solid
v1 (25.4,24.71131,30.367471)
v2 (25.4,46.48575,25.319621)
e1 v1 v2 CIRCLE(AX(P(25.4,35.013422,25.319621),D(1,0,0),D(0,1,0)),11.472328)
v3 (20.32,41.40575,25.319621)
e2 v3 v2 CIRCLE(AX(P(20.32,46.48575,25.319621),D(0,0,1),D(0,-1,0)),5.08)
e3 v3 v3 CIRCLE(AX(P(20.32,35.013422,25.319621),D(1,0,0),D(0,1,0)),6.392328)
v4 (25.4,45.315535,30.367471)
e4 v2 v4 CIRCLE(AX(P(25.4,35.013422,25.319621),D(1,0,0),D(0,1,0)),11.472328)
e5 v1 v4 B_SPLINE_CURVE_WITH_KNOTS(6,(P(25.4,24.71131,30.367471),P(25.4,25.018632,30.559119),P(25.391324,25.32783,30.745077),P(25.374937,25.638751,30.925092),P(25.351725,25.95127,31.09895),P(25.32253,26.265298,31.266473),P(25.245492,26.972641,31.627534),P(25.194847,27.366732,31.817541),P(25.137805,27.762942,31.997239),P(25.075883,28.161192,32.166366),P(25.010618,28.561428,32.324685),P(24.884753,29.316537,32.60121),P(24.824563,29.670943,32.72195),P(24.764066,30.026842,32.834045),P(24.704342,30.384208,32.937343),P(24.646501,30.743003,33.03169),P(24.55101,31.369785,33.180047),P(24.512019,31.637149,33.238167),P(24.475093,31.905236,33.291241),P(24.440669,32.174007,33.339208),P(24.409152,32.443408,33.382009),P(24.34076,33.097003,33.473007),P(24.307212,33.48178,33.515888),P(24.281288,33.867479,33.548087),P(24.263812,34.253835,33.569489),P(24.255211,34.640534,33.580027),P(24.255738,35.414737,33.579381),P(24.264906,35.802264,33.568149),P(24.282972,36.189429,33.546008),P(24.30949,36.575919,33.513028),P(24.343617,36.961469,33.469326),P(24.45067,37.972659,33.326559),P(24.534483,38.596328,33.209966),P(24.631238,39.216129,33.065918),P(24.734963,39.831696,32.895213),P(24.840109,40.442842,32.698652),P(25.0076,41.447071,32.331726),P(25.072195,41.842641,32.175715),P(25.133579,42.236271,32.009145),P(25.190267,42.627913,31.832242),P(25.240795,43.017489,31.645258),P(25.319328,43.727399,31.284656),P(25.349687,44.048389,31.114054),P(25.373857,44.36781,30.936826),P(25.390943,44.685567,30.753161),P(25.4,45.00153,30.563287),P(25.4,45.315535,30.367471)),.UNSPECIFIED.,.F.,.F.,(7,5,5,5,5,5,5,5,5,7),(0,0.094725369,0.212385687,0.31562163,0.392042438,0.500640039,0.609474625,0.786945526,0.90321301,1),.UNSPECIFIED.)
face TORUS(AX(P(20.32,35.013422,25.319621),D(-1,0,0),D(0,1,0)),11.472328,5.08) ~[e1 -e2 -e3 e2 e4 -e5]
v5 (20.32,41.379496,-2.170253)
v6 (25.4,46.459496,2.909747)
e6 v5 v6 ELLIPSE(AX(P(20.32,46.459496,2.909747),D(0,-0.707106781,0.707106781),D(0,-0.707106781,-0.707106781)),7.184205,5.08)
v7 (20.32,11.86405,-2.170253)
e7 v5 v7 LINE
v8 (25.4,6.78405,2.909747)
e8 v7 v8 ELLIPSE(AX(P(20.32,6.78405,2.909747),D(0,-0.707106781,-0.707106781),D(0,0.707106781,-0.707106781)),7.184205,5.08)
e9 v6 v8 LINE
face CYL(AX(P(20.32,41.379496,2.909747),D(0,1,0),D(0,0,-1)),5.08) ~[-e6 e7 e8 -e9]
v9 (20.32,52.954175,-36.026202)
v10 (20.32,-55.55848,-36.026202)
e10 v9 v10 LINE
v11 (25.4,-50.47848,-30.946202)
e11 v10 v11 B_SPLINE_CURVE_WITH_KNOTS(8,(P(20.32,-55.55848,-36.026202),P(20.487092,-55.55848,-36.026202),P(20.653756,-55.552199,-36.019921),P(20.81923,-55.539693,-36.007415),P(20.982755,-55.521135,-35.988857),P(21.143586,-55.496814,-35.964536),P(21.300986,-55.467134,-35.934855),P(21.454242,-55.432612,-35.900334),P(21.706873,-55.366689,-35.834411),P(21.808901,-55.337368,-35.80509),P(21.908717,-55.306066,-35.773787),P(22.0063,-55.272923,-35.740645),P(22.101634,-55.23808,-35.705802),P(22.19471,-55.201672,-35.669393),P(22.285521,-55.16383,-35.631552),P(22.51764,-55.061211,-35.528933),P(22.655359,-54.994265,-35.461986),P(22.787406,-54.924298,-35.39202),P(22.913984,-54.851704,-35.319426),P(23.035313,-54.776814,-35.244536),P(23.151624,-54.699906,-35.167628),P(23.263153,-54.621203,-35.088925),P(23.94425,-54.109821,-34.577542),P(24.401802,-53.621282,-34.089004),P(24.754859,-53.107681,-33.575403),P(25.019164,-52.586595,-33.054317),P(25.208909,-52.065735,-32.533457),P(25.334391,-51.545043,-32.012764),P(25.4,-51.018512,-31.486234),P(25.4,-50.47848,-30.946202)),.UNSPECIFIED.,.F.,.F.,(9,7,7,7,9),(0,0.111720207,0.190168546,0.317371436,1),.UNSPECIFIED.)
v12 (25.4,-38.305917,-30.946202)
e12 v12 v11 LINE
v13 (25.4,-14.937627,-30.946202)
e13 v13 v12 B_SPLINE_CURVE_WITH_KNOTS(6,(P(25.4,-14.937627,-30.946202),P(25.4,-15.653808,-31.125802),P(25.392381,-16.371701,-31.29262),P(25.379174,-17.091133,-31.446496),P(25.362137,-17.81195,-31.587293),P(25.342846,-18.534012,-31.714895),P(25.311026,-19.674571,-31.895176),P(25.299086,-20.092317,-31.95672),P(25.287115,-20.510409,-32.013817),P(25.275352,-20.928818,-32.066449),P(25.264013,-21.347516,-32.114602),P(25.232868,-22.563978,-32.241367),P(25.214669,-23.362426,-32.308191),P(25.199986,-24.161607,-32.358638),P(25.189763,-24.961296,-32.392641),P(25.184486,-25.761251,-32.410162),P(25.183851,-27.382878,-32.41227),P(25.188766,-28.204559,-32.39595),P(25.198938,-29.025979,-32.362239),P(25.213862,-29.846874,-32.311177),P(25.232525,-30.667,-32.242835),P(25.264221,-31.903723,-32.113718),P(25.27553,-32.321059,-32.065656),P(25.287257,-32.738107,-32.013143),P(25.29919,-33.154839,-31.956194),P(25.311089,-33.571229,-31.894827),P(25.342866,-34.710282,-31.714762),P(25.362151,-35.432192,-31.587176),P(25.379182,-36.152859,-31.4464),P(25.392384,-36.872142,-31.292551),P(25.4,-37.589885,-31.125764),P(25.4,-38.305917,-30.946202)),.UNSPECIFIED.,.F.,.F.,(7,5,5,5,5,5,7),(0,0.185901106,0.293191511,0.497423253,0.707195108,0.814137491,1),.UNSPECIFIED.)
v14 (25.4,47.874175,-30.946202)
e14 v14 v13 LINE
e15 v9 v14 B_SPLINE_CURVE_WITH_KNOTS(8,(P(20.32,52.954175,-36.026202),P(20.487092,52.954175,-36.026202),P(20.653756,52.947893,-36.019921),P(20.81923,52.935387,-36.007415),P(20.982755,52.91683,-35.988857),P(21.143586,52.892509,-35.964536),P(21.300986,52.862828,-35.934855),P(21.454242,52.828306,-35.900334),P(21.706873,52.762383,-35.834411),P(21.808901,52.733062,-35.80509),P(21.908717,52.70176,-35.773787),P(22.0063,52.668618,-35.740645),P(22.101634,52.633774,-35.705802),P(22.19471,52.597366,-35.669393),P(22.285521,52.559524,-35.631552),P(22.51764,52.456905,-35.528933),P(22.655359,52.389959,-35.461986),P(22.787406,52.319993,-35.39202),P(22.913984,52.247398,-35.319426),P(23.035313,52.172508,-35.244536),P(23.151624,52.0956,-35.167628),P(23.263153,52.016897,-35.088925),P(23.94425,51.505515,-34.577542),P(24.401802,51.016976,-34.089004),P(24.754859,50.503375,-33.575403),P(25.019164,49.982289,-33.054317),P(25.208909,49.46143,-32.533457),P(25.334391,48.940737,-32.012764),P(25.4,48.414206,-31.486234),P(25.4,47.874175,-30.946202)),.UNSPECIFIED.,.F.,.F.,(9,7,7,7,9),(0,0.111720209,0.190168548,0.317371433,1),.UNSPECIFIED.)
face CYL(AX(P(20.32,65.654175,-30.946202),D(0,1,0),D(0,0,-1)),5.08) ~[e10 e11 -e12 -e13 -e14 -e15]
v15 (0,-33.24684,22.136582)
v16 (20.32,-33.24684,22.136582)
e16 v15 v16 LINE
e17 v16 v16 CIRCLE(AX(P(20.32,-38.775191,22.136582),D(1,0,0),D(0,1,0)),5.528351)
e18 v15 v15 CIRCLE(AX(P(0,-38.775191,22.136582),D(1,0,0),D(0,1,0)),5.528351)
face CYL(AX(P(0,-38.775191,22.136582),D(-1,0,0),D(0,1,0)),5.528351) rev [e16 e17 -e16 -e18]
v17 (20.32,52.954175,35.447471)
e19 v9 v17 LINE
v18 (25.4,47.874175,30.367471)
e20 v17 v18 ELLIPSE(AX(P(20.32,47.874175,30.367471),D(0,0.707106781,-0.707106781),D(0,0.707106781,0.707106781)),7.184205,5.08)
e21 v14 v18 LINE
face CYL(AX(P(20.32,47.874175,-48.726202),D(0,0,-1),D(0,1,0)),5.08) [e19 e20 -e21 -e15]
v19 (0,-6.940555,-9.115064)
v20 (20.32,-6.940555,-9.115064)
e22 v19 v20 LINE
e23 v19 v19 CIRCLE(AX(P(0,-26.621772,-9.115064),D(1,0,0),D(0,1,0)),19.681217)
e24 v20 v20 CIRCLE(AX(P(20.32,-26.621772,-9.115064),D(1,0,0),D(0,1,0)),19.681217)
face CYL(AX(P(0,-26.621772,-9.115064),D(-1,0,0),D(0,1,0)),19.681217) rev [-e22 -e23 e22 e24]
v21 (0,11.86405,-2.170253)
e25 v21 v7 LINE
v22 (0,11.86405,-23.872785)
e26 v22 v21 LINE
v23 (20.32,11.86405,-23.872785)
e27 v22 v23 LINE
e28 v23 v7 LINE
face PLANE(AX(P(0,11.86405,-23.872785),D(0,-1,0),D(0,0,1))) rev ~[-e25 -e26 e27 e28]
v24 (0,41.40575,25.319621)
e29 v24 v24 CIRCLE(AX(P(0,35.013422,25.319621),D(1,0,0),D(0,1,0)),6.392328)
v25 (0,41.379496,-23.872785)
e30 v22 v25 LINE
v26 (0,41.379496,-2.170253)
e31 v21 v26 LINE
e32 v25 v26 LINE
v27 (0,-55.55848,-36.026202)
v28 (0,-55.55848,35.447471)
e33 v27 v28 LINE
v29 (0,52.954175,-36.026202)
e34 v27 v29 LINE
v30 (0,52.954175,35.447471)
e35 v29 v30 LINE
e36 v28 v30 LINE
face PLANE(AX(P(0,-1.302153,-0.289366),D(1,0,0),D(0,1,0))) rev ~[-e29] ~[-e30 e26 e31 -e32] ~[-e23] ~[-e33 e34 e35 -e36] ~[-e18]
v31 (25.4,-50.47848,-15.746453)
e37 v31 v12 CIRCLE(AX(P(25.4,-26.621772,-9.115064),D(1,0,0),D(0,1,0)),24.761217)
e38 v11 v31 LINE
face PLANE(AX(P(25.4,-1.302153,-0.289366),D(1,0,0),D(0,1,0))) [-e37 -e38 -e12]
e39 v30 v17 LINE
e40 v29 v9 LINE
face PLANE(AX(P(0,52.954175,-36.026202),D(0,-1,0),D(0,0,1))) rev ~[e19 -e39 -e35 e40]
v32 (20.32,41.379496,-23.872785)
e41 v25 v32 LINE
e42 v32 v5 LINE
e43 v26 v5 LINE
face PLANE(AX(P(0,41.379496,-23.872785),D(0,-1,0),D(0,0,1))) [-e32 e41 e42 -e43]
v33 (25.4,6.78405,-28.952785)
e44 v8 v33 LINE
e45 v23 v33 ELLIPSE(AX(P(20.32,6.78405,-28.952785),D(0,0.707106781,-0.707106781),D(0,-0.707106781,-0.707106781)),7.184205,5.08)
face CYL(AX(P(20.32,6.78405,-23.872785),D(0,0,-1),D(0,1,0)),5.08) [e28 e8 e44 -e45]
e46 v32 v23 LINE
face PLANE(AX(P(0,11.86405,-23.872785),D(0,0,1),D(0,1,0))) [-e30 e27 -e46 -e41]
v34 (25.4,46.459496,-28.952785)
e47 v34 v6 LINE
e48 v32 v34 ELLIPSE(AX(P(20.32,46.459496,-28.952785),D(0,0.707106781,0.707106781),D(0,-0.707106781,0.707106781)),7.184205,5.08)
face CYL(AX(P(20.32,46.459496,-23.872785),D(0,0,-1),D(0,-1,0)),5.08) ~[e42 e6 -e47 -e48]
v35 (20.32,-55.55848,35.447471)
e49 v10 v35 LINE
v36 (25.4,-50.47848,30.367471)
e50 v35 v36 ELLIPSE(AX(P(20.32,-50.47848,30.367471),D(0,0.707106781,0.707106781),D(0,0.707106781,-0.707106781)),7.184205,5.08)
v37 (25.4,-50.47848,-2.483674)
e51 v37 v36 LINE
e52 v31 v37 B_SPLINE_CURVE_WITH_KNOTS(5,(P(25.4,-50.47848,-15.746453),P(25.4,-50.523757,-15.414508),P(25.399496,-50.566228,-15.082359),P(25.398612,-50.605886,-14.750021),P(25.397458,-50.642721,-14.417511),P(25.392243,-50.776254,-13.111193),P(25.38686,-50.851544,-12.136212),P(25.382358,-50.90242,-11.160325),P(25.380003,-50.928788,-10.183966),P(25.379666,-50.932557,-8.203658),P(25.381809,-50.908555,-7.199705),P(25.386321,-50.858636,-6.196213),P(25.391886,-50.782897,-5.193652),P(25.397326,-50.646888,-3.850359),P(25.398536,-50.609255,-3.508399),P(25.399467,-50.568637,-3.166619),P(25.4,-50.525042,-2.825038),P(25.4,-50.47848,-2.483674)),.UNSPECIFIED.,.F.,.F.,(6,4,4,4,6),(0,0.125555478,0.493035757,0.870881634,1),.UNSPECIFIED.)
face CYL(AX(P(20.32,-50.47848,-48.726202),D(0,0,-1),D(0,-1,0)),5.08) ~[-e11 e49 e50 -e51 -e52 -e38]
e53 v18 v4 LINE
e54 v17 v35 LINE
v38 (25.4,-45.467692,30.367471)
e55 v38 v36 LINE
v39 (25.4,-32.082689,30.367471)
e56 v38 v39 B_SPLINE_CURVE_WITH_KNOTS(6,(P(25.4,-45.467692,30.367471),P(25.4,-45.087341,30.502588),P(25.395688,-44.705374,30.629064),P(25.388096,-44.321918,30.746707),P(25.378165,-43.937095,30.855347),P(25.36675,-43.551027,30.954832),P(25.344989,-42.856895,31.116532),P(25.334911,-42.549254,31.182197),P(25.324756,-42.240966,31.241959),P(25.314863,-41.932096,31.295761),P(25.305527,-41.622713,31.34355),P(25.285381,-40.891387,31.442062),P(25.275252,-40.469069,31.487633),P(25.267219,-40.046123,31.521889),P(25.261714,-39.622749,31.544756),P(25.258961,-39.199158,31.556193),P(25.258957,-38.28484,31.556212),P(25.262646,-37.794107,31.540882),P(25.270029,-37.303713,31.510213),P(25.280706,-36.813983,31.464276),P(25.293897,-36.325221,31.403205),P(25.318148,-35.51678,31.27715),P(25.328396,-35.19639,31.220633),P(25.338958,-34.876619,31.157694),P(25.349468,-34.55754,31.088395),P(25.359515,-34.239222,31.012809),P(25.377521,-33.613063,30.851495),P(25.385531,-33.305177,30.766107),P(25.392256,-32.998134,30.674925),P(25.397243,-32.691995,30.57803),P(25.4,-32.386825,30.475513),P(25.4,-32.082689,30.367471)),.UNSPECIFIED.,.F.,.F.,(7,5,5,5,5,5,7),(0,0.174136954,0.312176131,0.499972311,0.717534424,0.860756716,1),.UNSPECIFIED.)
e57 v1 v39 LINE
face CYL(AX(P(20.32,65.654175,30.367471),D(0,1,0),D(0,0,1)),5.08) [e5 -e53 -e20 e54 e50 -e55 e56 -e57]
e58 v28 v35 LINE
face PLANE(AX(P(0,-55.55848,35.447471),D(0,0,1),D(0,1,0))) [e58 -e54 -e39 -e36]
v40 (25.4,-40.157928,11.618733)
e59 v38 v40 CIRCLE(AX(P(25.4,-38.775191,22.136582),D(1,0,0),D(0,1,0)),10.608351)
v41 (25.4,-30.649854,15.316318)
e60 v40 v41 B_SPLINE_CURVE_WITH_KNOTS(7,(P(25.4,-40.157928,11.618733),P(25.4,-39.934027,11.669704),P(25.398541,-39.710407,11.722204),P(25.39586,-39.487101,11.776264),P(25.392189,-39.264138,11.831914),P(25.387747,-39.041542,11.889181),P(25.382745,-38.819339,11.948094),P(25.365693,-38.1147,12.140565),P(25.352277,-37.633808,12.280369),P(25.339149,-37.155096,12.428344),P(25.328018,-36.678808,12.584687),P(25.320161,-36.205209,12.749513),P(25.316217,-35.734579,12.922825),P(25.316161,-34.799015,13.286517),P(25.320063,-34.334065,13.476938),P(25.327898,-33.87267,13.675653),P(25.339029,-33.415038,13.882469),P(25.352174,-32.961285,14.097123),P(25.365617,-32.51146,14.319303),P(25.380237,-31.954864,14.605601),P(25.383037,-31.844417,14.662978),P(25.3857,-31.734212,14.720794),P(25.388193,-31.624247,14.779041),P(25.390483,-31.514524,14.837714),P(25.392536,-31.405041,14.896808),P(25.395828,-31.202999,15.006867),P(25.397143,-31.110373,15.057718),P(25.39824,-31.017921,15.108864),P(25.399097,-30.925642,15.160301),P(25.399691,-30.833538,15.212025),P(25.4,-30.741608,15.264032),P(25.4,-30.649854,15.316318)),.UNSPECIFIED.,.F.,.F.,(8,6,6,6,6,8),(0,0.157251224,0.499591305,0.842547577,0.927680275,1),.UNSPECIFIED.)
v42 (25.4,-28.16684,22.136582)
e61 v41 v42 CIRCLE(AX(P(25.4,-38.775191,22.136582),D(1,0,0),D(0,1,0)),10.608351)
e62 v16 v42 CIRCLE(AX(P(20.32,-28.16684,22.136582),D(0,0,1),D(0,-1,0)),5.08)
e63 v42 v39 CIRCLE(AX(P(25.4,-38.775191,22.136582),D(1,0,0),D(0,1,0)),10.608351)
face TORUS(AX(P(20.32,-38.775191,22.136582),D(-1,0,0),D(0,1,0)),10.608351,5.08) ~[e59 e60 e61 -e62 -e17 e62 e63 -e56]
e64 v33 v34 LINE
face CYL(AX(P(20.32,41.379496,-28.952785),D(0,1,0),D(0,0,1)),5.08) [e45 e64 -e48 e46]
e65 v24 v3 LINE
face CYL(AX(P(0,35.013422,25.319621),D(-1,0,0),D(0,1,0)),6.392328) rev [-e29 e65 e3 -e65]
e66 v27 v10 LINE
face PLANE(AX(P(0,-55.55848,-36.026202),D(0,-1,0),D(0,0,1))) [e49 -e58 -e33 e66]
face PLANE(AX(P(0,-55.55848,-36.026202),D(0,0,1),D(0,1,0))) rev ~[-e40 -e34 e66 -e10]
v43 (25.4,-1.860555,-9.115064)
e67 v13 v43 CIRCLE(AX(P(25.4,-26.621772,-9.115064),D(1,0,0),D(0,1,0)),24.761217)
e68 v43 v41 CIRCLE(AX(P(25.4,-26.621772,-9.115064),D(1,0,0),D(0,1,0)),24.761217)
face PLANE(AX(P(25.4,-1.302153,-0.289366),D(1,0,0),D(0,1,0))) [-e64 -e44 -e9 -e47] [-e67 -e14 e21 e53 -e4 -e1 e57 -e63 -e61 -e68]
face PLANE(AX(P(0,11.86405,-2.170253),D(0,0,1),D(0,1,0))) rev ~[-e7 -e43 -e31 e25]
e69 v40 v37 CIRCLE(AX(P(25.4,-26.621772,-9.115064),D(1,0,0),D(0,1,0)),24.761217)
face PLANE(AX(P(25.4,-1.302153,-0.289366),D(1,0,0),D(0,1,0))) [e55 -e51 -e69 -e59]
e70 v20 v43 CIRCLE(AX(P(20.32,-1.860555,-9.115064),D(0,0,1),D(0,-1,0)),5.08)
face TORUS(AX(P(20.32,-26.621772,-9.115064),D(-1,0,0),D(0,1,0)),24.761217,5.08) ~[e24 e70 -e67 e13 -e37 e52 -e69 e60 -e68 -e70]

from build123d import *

# Parameters (mm, degrees)
F0_W         = 108.5126549006
F0_H         = 71.473672986
F0_R         = 19.6812167499
F0_W_2       = 29.5154461637
F0_H_2       = 21.7025321908
F0_R_2       = 5.5283506547
F0_R_3       = 6.3923279955
F1_DEPTH     = 25.4
F2_T1_DEPTH  = 29.5154461637
F2_T3_DEPTH  = 133.9126549006
F2_T5_DEPTH  = 96.873672986
F2_T7_DEPTH  = 21.7025321908
F2_T19_DEPTH = 34.4025321908
F2_T23_DEPTH = 42.2154461637
F2_T30_DEPTH = 42.2154461637
F2_T34_DEPTH = 34.4025321908
F2_T41_DEPTH = 34.4025321908
F2_T45_DEPTH = 42.2154461637
F2_T52_DEPTH = 34.4025321908
F2_T56_DEPTH = 42.2154461637


# Not quite as in the source:
# - a fillet or chamfer that OpenCascade refuses, or shapes differently, is made with other operations: its cross-section is extruded or revolved along the edge and cut away or added


with BuildPart() as f1:
    # F0 (on Right) → F1 (new body)
    with BuildSketch(Plane.YZ):
        with Locations((-1.3021528721, -0.2893656492)):
            Rectangle(F0_W, F0_H)
        with Locations((-26.6217719764, -9.1150635853)):
            Circle(F0_R, mode=Mode.SUBTRACT)
        with Locations((26.6217733733, -13.0215191748)):
            Rectangle(F0_W_2, F0_H_2, mode=Mode.SUBTRACT)
        with Locations((-38.775190711, 22.1365820616)):
            Circle(F0_R_2, mode=Mode.SUBTRACT)
        with Locations((35.01342237, 25.3196209669)):
            Circle(F0_R_3, mode=Mode.SUBTRACT)
    extrude(amount=F1_DEPTH)

    # F2: fillet of radius 5.08 on 11 edges, made by hand

    # F2_s2 → F2_t1 (cut)
    with BuildSketch(Plane.XZ.offset(-41.3794964552)):
        with BuildLine():
            ThreePointArc((20.32, -2.1702530794), (23.9121024484, -0.6823555278), (25.4, 2.9097469206))
            Line((25.4, 2.9097469206), (25.4, -2.1702530794))
            Line((25.4, -2.1702530794), (20.32, -2.1702530794))
        make_face()
        with BuildLine():
            ThreePointArc((20.32, -23.8727852702), (23.9121024484, -25.3606828218), (25.4, -28.9527852702))
            Line((25.4, -28.9527852702), (25.4, -23.8727852702))
            Line((25.4, -23.8727852702), (20.32, -23.8727852702))
        make_face()
    extrude(amount=F2_T1_DEPTH, mode=Mode.SUBTRACT)

    # F2_s4 → F2_t3 (cut)
    with BuildSketch(Plane.XZ.offset(-65.6541745782)):
        with BuildLine():
            ThreePointArc((20.32, 35.4474708438), (23.9121024484, 33.9595732922), (25.4, 30.3674708438))
            Line((25.4, 30.3674708438), (25.4, 35.4474708438))
            Line((25.4, 35.4474708438), (20.32, 35.4474708438))
        make_face()
        with BuildLine():
            ThreePointArc((20.32, -36.0262021422), (23.9121024484, -34.5383045907), (25.4, -30.9462021422))
            Line((25.4, -30.9462021422), (25.4, -36.0262021422))
            Line((25.4, -36.0262021422), (20.32, -36.0262021422))
        make_face()
    extrude(amount=F2_T3_DEPTH, mode=Mode.SUBTRACT)

    # F2_s6 → F2_t5 (cut)
    with BuildSketch(Plane.XY.offset(-48.7262021422)):
        with BuildLine():
            ThreePointArc((20.32, -55.5584803224), (23.9121024484, -54.0705827708), (25.4, -50.4784803224))
            Line((25.4, -50.4784803224), (25.4, -55.5584803224))
            Line((25.4, -55.5584803224), (20.32, -55.5584803224))
        make_face()
        with BuildLine():
            ThreePointArc((20.32, 52.9541745782), (23.9121024484, 51.4662770266), (25.4, 47.8741745782))
            Line((25.4, 47.8741745782), (25.4, 52.9541745782))
            Line((25.4, 52.9541745782), (20.32, 52.9541745782))
        make_face()
    extrude(amount=F2_T5_DEPTH, mode=Mode.SUBTRACT)

    # F2_s8 → F2_t7 (cut)
    with BuildSketch(Plane.XY.offset(-23.8727852702)):
        with BuildLine():
            ThreePointArc((20.32, 11.8640502915), (23.9121024484, 10.3761527399), (25.4, 6.7840502915))
            Line((25.4, 6.7840502915), (25.4, 11.8640502915))
            Line((25.4, 11.8640502915), (20.32, 11.8640502915))
        make_face()
        with BuildLine():
            ThreePointArc((20.32, 41.3794964552), (23.9121024484, 42.8673940068), (25.4, 46.4594964552))
            Line((25.4, 46.4594964552), (25.4, 41.3794964552))
            Line((25.4, 41.3794964552), (20.32, 41.3794964552))
        make_face()
    extrude(amount=F2_T7_DEPTH, mode=Mode.SUBTRACT)

    # F2_s9 → F2_t10 (revolve, cut)
    with BuildSketch(Plane.XY.offset(-9.1150635853)):
        with BuildLine():
            ThreePointArc((20.32, -6.9405552264), (23.9121024484, -5.4526576749), (25.4, -1.8605552264))
            Line((25.4, -1.8605552264), (25.4, -6.9405552264))
            Line((25.4, -6.9405552264), (20.32, -6.9405552264))
        make_face()
    revolve(axis=Axis((25.4, -26.6217719764, -9.1150635853), (1, 0, 0)), mode=Mode.SUBTRACT)

    # F2_s11 → F2_t12 (revolve, cut)
    with BuildSketch(Plane.XY.offset(22.1365820616)):
        with BuildLine():
            ThreePointArc((20.32, -33.2468400563), (23.9121024484, -31.7589425047), (25.4, -28.1668400563))
            Line((25.4, -28.1668400563), (25.4, -33.2468400563))
            Line((25.4, -33.2468400563), (20.32, -33.2468400563))
        make_face()
    revolve(axis=Axis((25.4, -38.775190711, 22.1365820616), (1, 0, 0)), mode=Mode.SUBTRACT)

    # F2_s13 → F2_t14 (revolve, cut)
    with BuildSketch(Plane.XY.offset(25.3196209669)):
        with BuildLine():
            ThreePointArc((20.32, 41.4057503654), (23.9121024484, 42.893647917), (25.4, 46.4857503654))
            Line((25.4, 46.4857503654), (25.4, 41.4057503654))
            Line((25.4, 41.4057503654), (20.32, 41.4057503654))
        make_face()
    revolve(axis=Axis((25.4, 35.01342237, 25.3196209669), (1, 0, 0)), mode=Mode.SUBTRACT)


with BuildPart() as f2_tool17:
    # F2_s18 → F2_t19 (new body)
    with BuildSketch(Plane.XY.offset(-23.8727852702)):
        with BuildLine():
            ThreePointArc((20.32, 11.8640502915), (23.9121024484, 10.3761527399), (25.4, 6.7840502915))
            Line((25.4, 6.7840502915), (25.4, 11.8640502915))
            Line((25.4, 11.8640502915), (20.32, 11.8640502915))
        make_face()
    extrude(amount=F2_T19_DEPTH)

    split(bisect_by=Plane.XY.offset(-2.1702530794), keep=Keep.TOP)


with BuildPart() as f2_tool21:
    # F2_s22 → F2_t23 (new body)
    with BuildSketch(Plane.XZ.offset(0.8359497085)):
        with BuildLine():
            ThreePointArc((20.32, -2.1702530794), (23.9121024484, -0.6823555278), (25.4, 2.9097469206))
            Line((25.4, 2.9097469206), (25.4, -2.1702530794))
            Line((25.4, -2.1702530794), (20.32, -2.1702530794))
        make_face()
    extrude(amount=-F2_T23_DEPTH)

    split(bisect_by=Plane.XZ.offset(-11.8640502915), keep=Keep.TOP)


with BuildPart() as f2_tool17_1:
    add(f2_tool17.part)

    # F2_t25: intersect F2_tool21
    add(f2_tool21.part, mode=Mode.INTERSECT)


with BuildPart() as f1_1:
    add(f1.part)

    # F2_t15: cut F2_tool17
    add(f2_tool17_1.part, mode=Mode.SUBTRACT)


with BuildPart() as f2_tool28:
    # F2_s29 → F2_t30 (new body)
    with BuildSketch(Plane.XZ.offset(-11.8640502915)):
        with BuildLine():
            ThreePointArc((20.32, -2.1702530794), (23.9121024484, -0.6823555278), (25.4, 2.9097469206))
            Line((25.4, 2.9097469206), (25.4, -2.1702530794))
            Line((25.4, -2.1702530794), (20.32, -2.1702530794))
        make_face()
    extrude(amount=-F2_T30_DEPTH)

    split(bisect_by=Plane.XZ.offset(-41.3794964552), keep=Keep.BOTTOM)


with BuildPart() as f2_tool32:
    # F2_s33 → F2_t34 (new body)
    with BuildSketch(Plane.XY.offset(10.5297469206)):
        with BuildLine():
            ThreePointArc((20.32, 41.3794964552), (23.9121024484, 42.8673940068), (25.4, 46.4594964552))
            Line((25.4, 46.4594964552), (25.4, 41.3794964552))
            Line((25.4, 41.3794964552), (20.32, 41.3794964552))
        make_face()
    extrude(amount=-F2_T34_DEPTH)

    split(bisect_by=Plane.XY.offset(-2.1702530794), keep=Keep.TOP)


with BuildPart() as f2_tool28_1:
    add(f2_tool28.part)

    # F2_t36: intersect F2_tool32
    add(f2_tool32.part, mode=Mode.INTERSECT)


with BuildPart() as f1_2:
    add(f1_1.part)

    # F2_t26: cut F2_tool28
    add(f2_tool28_1.part, mode=Mode.SUBTRACT)


with BuildPart() as f2_tool39:
    # F2_s40 → F2_t41 (new body)
    with BuildSketch(Plane.XY.offset(-36.5727852702)):
        with BuildLine():
            ThreePointArc((20.32, 11.8640502915), (23.9121024484, 10.3761527399), (25.4, 6.7840502915))
            Line((25.4, 6.7840502915), (25.4, 11.8640502915))
            Line((25.4, 11.8640502915), (20.32, 11.8640502915))
        make_face()
    extrude(amount=F2_T41_DEPTH)

    split(bisect_by=Plane.XY.offset(-23.8727852702), keep=Keep.BOTTOM)


with BuildPart() as f2_tool43:
    # F2_s44 → F2_t45 (new body)
    with BuildSketch(Plane.XZ.offset(-41.3794964552)):
        with BuildLine():
            ThreePointArc((20.32, -23.8727852702), (23.9121024484, -25.3606828218), (25.4, -28.9527852702))
            Line((25.4, -28.9527852702), (25.4, -23.8727852702))
            Line((25.4, -23.8727852702), (20.32, -23.8727852702))
        make_face()
    extrude(amount=F2_T45_DEPTH)

    split(bisect_by=Plane.XZ.offset(-11.8640502915), keep=Keep.TOP)


with BuildPart() as f2_tool39_1:
    add(f2_tool39.part)

    # F2_t47: intersect F2_tool43
    add(f2_tool43.part, mode=Mode.INTERSECT)


with BuildPart() as f1_3:
    add(f1_2.part)

    # F2_t37: cut F2_tool39
    add(f2_tool39_1.part, mode=Mode.SUBTRACT)


with BuildPart() as f2_tool50:
    # F2_s51 → F2_t52 (new body)
    with BuildSketch(Plane.XY.offset(-2.1702530794)):
        with BuildLine():
            ThreePointArc((20.32, 41.3794964552), (23.9121024484, 42.8673940068), (25.4, 46.4594964552))
            Line((25.4, 46.4594964552), (25.4, 41.3794964552))
            Line((25.4, 41.3794964552), (20.32, 41.3794964552))
        make_face()
    extrude(amount=-F2_T52_DEPTH)

    split(bisect_by=Plane.XY.offset(-23.8727852702), keep=Keep.BOTTOM)


with BuildPart() as f2_tool54:
    # F2_s55 → F2_t56 (new body)
    with BuildSketch(Plane.XZ.offset(-54.0794964552)):
        with BuildLine():
            ThreePointArc((20.32, -23.8727852702), (23.9121024484, -25.3606828218), (25.4, -28.9527852702))
            Line((25.4, -28.9527852702), (25.4, -23.8727852702))
            Line((25.4, -23.8727852702), (20.32, -23.8727852702))
        make_face()
    extrude(amount=F2_T56_DEPTH)

    split(bisect_by=Plane.XZ.offset(-41.3794964552), keep=Keep.BOTTOM)


with BuildPart() as f2_tool50_1:
    add(f2_tool50.part)

    # F2_t58: intersect F2_tool54
    add(f2_tool54.part, mode=Mode.INTERSECT)


with BuildPart() as f1_4:
    add(f1_3.part)

    # F2_t48: cut F2_tool50
    add(f2_tool50_1.part, mode=Mode.SUBTRACT)


solid = f1_4.part
